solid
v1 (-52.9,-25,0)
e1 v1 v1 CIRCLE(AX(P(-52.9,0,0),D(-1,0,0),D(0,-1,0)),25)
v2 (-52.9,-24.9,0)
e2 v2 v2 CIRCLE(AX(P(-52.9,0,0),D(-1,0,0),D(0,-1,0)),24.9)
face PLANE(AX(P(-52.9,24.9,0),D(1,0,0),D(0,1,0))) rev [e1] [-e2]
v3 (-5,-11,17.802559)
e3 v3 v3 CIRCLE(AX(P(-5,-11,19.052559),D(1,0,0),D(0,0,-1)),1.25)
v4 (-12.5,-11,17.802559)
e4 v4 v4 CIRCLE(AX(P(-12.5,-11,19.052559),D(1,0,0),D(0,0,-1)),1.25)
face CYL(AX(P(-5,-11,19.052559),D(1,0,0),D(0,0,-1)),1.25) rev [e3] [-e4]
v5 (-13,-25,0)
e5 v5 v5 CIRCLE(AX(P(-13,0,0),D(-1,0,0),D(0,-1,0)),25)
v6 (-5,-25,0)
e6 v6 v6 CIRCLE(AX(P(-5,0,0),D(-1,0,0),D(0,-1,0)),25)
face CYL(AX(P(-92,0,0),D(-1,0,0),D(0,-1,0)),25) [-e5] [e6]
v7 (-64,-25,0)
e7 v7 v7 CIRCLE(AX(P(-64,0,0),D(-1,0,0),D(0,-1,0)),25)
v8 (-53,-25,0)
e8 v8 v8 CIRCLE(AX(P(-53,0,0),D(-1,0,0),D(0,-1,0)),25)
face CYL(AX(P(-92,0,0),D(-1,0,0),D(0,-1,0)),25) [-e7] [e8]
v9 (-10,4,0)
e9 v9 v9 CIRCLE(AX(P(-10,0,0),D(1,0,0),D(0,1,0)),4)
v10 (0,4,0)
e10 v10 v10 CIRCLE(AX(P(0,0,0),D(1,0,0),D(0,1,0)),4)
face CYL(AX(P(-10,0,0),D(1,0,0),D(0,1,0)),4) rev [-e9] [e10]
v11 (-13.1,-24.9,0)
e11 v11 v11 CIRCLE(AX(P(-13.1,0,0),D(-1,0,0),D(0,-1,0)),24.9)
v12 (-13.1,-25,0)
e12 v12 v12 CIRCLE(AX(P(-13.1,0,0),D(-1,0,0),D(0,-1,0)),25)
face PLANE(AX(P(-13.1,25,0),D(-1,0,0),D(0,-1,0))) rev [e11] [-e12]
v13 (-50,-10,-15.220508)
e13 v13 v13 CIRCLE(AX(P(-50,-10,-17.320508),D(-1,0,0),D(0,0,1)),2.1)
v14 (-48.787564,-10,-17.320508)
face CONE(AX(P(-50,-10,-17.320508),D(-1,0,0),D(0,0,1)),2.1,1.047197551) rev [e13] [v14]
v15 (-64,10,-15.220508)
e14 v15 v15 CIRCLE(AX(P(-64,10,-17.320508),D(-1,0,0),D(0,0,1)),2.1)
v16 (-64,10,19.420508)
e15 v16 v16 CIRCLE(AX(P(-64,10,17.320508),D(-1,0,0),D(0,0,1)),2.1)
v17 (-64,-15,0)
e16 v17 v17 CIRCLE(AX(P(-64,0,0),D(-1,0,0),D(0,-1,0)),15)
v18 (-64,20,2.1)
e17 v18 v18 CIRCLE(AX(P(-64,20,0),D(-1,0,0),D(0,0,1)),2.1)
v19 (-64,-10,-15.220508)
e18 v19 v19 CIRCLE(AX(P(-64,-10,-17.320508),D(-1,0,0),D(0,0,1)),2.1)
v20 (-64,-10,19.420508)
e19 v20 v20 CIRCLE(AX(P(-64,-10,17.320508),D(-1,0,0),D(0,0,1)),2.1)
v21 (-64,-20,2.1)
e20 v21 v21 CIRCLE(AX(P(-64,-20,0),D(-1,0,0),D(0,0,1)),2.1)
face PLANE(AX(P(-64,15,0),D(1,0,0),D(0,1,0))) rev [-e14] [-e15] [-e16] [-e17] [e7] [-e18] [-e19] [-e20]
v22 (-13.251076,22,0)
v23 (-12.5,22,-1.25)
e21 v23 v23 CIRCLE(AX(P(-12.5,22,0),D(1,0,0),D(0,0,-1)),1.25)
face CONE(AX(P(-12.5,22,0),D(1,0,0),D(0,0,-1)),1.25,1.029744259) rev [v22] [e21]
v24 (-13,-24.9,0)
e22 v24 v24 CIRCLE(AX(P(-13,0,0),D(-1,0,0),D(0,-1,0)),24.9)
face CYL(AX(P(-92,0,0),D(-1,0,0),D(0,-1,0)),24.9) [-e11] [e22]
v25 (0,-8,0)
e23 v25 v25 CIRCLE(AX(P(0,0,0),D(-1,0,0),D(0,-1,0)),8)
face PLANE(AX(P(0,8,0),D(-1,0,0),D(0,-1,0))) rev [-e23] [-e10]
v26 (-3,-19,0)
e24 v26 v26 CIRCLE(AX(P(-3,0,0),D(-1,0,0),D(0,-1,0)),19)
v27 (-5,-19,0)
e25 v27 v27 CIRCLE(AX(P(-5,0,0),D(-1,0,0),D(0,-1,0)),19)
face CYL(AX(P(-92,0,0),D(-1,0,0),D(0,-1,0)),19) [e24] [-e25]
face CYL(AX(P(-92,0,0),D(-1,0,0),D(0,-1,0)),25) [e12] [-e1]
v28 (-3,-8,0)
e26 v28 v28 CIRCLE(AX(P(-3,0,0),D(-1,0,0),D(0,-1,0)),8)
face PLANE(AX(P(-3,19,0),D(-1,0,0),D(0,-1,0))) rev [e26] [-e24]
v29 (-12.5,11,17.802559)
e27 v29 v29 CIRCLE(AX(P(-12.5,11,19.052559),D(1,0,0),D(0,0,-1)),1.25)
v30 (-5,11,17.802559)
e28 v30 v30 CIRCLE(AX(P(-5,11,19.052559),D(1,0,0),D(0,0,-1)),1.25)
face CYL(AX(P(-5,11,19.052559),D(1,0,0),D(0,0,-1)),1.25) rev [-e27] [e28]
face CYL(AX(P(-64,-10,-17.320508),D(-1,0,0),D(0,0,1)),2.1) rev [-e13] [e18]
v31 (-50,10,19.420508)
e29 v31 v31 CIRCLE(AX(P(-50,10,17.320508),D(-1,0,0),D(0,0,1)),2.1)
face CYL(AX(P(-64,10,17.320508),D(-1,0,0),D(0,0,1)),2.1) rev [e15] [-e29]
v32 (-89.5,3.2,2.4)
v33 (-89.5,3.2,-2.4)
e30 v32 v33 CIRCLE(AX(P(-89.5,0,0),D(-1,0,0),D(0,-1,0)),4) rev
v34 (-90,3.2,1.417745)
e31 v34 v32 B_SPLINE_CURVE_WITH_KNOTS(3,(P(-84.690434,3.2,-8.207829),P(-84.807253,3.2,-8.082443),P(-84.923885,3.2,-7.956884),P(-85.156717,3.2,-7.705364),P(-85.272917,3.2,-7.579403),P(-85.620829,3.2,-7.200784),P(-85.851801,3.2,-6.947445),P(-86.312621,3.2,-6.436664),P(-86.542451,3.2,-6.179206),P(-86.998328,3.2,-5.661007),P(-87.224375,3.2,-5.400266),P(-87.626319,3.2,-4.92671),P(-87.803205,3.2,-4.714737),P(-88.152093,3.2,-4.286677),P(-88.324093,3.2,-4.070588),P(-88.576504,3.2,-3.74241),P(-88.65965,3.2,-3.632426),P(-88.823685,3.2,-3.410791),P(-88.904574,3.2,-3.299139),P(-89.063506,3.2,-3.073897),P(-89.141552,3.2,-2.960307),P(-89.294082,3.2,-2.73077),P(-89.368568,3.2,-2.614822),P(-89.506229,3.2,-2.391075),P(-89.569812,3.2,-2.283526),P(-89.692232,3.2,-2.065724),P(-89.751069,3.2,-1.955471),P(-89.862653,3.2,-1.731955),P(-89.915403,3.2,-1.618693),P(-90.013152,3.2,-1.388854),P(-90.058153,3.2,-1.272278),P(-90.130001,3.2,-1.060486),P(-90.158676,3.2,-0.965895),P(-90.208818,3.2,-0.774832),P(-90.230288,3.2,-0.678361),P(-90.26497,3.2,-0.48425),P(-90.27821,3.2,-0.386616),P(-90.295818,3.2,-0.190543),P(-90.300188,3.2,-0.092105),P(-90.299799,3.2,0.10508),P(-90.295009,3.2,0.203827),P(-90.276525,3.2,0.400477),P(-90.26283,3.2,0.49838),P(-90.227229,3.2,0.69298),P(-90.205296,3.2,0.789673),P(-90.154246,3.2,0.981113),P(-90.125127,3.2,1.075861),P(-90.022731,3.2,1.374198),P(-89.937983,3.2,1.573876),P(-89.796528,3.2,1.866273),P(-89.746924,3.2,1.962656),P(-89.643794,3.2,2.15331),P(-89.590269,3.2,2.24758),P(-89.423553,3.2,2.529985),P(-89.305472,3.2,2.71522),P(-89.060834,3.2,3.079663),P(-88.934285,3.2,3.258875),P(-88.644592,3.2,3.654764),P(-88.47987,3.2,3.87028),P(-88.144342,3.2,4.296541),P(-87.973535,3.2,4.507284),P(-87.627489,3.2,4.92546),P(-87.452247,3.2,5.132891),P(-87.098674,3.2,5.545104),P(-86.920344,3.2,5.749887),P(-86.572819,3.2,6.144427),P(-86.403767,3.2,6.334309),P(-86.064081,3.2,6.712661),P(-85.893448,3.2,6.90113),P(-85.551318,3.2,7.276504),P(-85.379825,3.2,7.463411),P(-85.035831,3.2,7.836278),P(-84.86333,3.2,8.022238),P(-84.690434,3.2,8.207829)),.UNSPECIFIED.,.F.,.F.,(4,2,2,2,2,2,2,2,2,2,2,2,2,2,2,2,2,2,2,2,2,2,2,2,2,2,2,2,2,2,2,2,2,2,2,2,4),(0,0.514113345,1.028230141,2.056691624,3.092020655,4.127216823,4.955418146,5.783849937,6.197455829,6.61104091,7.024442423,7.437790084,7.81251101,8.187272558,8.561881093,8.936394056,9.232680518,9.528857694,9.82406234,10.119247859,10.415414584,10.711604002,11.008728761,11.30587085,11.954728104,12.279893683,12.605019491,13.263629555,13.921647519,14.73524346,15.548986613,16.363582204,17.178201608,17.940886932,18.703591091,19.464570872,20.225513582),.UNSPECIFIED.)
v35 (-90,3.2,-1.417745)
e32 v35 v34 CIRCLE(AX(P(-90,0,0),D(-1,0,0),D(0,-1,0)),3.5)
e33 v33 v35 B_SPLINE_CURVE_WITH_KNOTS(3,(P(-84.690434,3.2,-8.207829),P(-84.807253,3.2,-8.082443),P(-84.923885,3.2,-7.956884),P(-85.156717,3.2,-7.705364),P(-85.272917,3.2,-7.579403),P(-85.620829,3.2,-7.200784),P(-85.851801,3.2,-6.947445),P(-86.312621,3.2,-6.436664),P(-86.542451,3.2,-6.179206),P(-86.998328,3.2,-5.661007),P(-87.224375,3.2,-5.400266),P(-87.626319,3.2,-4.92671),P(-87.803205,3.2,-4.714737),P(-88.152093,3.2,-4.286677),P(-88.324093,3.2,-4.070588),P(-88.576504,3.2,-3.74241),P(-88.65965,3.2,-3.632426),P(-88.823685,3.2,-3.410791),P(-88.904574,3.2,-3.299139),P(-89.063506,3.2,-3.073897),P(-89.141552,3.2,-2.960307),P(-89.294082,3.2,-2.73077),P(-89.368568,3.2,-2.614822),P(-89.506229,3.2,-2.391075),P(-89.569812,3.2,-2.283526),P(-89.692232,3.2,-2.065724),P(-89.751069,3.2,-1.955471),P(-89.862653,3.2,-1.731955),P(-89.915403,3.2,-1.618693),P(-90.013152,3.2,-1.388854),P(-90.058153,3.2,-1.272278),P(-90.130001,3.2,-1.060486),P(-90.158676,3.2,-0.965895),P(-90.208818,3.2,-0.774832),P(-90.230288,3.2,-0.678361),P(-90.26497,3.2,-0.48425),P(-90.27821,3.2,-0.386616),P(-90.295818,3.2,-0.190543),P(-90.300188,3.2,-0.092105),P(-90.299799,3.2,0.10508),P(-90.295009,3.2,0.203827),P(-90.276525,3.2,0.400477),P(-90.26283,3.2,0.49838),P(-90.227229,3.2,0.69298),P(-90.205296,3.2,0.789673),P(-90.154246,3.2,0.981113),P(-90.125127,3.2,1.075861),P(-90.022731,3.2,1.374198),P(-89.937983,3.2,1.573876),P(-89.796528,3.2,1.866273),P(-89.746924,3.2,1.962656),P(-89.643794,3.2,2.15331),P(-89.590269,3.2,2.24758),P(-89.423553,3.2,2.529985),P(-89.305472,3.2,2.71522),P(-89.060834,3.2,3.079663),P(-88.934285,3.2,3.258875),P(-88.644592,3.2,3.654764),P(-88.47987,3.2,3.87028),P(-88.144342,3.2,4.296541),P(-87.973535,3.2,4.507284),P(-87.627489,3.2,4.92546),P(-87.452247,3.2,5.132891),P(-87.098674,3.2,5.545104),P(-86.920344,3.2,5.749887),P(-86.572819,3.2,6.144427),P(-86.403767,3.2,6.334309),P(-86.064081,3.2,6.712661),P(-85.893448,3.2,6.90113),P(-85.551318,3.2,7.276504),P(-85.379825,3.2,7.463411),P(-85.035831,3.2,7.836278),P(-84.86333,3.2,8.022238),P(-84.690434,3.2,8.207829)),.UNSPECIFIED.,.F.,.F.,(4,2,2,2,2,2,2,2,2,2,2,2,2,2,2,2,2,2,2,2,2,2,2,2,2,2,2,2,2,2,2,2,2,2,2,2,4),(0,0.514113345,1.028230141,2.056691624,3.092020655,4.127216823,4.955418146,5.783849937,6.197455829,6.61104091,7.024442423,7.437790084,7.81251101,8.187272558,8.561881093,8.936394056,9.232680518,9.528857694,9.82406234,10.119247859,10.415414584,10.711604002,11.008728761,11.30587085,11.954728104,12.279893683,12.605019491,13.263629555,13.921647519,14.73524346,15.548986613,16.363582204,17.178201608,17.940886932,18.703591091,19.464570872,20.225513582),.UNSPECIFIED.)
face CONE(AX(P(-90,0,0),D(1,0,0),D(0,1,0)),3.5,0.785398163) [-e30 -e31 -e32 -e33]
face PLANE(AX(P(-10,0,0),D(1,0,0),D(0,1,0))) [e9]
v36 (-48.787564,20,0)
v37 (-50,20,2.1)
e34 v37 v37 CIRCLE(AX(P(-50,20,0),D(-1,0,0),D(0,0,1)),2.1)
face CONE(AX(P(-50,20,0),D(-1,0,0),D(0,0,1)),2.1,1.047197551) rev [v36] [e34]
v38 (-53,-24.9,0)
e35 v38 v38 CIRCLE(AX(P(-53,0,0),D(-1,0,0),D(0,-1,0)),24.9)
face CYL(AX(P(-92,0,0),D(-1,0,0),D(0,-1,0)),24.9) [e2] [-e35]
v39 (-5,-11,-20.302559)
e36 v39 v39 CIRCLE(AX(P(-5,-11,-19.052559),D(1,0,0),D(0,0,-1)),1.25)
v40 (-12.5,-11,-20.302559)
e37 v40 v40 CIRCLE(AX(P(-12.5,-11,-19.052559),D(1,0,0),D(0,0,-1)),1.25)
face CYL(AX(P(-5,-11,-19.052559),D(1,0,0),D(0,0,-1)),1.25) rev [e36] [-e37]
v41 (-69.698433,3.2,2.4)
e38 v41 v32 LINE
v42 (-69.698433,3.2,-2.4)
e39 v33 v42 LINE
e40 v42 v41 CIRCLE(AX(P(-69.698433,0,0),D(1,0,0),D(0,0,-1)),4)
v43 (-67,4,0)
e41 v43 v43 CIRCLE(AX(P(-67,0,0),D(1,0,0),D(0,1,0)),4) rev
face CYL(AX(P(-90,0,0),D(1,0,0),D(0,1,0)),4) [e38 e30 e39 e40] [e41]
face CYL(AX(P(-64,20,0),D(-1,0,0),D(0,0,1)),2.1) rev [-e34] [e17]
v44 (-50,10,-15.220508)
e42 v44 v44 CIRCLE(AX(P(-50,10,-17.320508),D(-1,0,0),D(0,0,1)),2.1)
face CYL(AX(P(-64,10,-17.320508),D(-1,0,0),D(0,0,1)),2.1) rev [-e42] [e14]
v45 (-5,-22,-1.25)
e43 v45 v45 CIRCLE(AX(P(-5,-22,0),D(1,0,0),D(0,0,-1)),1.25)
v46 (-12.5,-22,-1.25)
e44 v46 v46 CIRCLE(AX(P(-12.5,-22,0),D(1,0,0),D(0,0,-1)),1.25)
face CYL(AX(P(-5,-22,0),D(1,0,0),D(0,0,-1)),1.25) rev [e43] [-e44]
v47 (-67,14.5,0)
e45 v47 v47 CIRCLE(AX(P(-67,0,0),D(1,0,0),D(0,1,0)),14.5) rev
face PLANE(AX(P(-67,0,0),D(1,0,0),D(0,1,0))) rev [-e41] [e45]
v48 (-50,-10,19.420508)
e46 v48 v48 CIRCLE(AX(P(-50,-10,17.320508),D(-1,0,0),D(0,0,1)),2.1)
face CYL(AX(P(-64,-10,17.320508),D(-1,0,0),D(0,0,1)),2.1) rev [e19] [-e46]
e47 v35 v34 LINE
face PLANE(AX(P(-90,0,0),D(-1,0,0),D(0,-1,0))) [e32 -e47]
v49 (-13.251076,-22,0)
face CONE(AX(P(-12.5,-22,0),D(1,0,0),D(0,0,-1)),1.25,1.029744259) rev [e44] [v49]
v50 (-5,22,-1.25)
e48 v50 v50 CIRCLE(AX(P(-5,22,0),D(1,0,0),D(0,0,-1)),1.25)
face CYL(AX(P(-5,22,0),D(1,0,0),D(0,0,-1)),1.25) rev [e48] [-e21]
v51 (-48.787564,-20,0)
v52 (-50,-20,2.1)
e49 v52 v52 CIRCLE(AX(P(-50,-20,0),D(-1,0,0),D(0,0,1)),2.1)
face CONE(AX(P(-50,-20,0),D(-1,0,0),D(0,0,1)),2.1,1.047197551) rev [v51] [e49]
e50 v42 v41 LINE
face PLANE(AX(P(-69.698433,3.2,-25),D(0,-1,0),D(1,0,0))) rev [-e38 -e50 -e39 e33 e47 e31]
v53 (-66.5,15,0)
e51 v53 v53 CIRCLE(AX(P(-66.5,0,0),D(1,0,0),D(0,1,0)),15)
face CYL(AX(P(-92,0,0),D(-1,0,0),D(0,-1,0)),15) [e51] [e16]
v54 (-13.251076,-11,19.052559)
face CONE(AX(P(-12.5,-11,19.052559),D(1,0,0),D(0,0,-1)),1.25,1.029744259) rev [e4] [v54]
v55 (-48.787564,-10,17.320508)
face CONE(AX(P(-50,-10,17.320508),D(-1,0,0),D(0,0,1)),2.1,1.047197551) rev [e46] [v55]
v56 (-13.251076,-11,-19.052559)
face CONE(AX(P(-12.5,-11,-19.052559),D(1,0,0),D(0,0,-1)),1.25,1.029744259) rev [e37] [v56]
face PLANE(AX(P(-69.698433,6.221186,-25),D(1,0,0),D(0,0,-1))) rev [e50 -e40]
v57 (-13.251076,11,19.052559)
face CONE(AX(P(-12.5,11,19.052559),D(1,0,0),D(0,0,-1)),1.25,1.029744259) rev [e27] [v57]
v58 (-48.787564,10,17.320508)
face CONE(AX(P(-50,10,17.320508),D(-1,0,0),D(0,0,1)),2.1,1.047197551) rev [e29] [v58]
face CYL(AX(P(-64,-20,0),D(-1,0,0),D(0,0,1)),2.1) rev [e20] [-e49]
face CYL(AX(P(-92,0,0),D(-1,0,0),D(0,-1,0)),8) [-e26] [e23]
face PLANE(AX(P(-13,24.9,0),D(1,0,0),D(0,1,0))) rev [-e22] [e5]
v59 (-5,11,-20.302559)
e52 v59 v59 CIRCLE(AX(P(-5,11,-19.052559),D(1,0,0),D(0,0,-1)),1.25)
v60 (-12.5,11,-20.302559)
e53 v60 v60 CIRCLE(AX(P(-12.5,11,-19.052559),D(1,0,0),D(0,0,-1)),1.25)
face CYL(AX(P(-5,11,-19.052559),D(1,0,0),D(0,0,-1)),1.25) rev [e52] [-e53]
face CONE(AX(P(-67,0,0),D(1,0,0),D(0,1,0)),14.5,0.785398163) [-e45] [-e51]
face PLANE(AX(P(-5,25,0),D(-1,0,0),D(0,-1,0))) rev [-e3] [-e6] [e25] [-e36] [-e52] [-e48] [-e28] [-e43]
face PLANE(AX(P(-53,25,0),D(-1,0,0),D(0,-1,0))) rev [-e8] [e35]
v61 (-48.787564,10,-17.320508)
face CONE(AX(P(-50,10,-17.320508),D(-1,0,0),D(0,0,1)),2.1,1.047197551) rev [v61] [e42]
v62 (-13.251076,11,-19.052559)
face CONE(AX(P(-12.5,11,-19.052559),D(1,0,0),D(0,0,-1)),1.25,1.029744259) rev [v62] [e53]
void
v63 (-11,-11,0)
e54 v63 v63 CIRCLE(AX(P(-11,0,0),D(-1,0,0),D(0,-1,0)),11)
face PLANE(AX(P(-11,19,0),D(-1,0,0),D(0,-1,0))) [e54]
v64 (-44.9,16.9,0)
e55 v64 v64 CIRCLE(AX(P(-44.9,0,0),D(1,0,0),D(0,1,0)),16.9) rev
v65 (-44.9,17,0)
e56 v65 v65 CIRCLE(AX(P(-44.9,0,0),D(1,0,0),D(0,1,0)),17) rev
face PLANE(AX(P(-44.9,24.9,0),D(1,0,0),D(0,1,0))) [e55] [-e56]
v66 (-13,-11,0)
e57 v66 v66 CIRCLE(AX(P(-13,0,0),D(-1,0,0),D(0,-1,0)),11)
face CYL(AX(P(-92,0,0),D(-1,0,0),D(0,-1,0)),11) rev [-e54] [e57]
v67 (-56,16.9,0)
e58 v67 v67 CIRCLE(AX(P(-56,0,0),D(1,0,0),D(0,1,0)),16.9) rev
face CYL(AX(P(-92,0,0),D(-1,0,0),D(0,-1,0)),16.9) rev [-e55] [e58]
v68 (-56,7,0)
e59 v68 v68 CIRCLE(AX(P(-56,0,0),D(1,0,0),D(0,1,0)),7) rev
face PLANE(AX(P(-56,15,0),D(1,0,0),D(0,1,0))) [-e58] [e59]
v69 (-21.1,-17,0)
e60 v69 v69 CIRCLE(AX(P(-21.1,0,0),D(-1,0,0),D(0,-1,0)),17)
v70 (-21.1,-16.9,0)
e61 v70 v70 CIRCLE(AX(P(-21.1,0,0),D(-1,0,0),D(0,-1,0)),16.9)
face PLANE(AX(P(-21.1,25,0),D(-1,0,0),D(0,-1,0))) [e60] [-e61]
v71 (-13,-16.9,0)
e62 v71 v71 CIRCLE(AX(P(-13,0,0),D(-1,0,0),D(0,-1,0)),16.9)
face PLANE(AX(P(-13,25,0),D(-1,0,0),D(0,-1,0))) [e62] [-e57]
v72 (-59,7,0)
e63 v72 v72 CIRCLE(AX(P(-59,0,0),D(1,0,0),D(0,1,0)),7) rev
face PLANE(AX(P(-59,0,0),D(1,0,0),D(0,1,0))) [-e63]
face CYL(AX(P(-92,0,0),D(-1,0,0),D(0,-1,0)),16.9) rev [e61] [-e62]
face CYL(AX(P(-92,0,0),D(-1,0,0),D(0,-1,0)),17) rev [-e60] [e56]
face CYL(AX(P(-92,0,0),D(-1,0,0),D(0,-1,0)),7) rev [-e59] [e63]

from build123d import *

# Parameters (mm, degrees)
COQUE2_START                 = -56
COQUE2_OUTLINE_R             = 16.9
COQUE2_DEPTH                 = 43
COQUE2_START_2               = -59
COQUE2_2_OUTLINE_R           = 7
COQUE2_2_DEPTH               = 48
COQUE2_START_3               = -13
COQUE2_3_OUTLINE_R           = 11
COQUE2_3_OUTLINE_R_2         = 7
COQUE2_3_DEPTH               = 2
COQUE2_START_4               = -44.9
COQUE2_4_OUTLINE_R           = 17
COQUE2_4_OUTLINE_R_2         = 16.9
COQUE2_4_DEPTH               = 23.8
CHANFREIN1_SIZE              = 0.5
ESQUISSE6_R                  = 4
EXTRUSION1_DEPTH             = 10
ESQUISSE8_R                  = 4
EXTRUSION2_DEPTH             = 23
R_P_TITION_CIRCULAIRE1_COUNT = 6
CHANFREIN2_SIZE              = 0.5
EXTRUSION3_DEPTH             = 97.695398029
EXTRUSION3_DEPTH_BACK        = 97.695398029
ESQUISSE11_W                 = 21.903594892
ESQUISSE11_H                 = 3.021185502


# Read off the part's stored shape, not the designer's step: Coque2
with BuildPart() as part:
    # Esquisse1 → Base-Révolution (revolve)
    with BuildSketch(Plane.XY, mode=Mode.PRIVATE) as base_r_volution_sk:
        Polygon((-67, 0), (-67, 15), (-64, 15), (-64, 25), (-53, 25), (-53, 24.9), (-52.9, 24.9), (-52.9, 25), (-13.1, 25), (-13.1, 24.9), (-13, 24.9), (-13, 25), (-5, 25), (-5, 19), (-3, 19), (-3, 8), (0, 8), (0, 0), align=None)
    revolve(base_r_volution_sk.sketch.rotate(Axis((-92, 0, 0), (1, 0, 0)), 180), axis=Axis((-92, 0, 0), (1, 0, 0)))

    # Coque2 outline → Coque2 (cut)
    with BuildSketch(Plane.YZ.offset(COQUE2_START)):
        Circle(COQUE2_OUTLINE_R)
    extrude(amount=COQUE2_DEPTH, mode=Mode.SUBTRACT)

    # Coque2 2 outline → Coque2 2 (cut)
    with BuildSketch(Plane.YZ.offset(COQUE2_START_2)):
        Circle(COQUE2_2_OUTLINE_R)
    extrude(amount=COQUE2_2_DEPTH, mode=Mode.SUBTRACT)

    # Coque2 3 outline → Coque2 3 (cut)
    with BuildSketch(Plane.YZ.offset(COQUE2_START_3)):
        Circle(COQUE2_3_OUTLINE_R)
        Circle(COQUE2_3_OUTLINE_R_2, mode=Mode.SUBTRACT)
    extrude(amount=COQUE2_3_DEPTH, mode=Mode.SUBTRACT)

    # Coque2 4 outline → Coque2 4 (cut)
    with BuildSketch(Plane.YZ.offset(COQUE2_START_4)):
        Circle(COQUE2_4_OUTLINE_R)
        Circle(COQUE2_4_OUTLINE_R_2, mode=Mode.SUBTRACT)
    extrude(amount=COQUE2_4_DEPTH, mode=Mode.SUBTRACT)

    # Esquisse4 → Trou taraudé M5x0.81 (revolve, cut)
    with BuildSketch(Plane(origin=(-64, 20, 0), x_dir=(0, 0, 1), z_dir=(0, 1, 0))):
        Polygon((0, 0), (0, 15.212435565), (2.1, 14), (2.1, 0), align=None)
    trou_taraud_m5x0_81 = revolve(axis=Axis((-70.35, 20, 0), (1, 0, 0)), mode=Mode.SUBTRACT)

    # Chanfrein1
    chanfrein1_edges = [part.edges().sort_by_distance(p)[0] for p in [
        (-67, 15, 0),
    ]]
    chamfer(chanfrein1_edges, length=CHANFREIN1_SIZE)

    # Esquisse6 → Extrusion1 (cut)
    with BuildSketch(Plane(origin=(0, 0, 0), x_dir=(0, 0, -1), z_dir=(1, 0, 0))):
        with Locations(Location((0, 0, 0), (0, 0, 90))):
            Circle(ESQUISSE6_R)
    extrude(amount=-EXTRUSION1_DEPTH, mode=Mode.SUBTRACT)

    # Esquisse8 → Extrusion2 (add)
    with BuildSketch(Plane.ZY.offset(67)):
        with Locations(Location((0, 0, 0), (0, 0, 90))):
            Circle(ESQUISSE8_R)
    extrude(amount=EXTRUSION2_DEPTH)

    # Esquisse9 → Trou taraudé M31 (revolve, cut)
    with BuildSketch(Plane(origin=(-5, 22, 0), x_dir=(0, 0, -1), z_dir=(0, 1, 0))):
        Polygon((0, 0), (0, 8.251075774), (1.25, 7.5), (1.25, 0), align=None)
    trou_taraud_m31 = revolve(axis=Axis((1.35, 22, 0), (-1, 0, 0)), mode=Mode.SUBTRACT)

    # Répétition circulaire1: Trou taraudé M5x0.81, Trou taraudé M31 ×6 about axis
    r_p_tition_circulaire1_axis = Axis((0, 0, 0), (1, 0, 0))
    add([trou_taraud_m5x0_81.rotate(r_p_tition_circulaire1_axis, i * 360 / R_P_TITION_CIRCULAIRE1_COUNT) for i in range(1, R_P_TITION_CIRCULAIRE1_COUNT)], mode=Mode.SUBTRACT)
    add([trou_taraud_m31.rotate(r_p_tition_circulaire1_axis, i * 360 / R_P_TITION_CIRCULAIRE1_COUNT) for i in range(1, R_P_TITION_CIRCULAIRE1_COUNT)], mode=Mode.SUBTRACT)

    # Chanfrein2
    chanfrein2_edges = [part.edges().sort_by_distance(p)[0] for p in [
        (-90, -4, 0),
    ]]
    chamfer(chanfrein2_edges, length=CHANFREIN2_SIZE)

    # Esquisse11 → Extrusion3 (cut, two sides: drawn at the far end of the back side and taken through both)
    with BuildSketch(Plane.XY.offset(-EXTRUSION3_DEPTH_BACK)):
        with Locations((-80.650230715, 4.710592751)):
            Rectangle(ESQUISSE11_W, ESQUISSE11_H)
    extrude(amount=EXTRUSION3_DEPTH + EXTRUSION3_DEPTH_BACK, mode=Mode.SUBTRACT)


solid = part.part
